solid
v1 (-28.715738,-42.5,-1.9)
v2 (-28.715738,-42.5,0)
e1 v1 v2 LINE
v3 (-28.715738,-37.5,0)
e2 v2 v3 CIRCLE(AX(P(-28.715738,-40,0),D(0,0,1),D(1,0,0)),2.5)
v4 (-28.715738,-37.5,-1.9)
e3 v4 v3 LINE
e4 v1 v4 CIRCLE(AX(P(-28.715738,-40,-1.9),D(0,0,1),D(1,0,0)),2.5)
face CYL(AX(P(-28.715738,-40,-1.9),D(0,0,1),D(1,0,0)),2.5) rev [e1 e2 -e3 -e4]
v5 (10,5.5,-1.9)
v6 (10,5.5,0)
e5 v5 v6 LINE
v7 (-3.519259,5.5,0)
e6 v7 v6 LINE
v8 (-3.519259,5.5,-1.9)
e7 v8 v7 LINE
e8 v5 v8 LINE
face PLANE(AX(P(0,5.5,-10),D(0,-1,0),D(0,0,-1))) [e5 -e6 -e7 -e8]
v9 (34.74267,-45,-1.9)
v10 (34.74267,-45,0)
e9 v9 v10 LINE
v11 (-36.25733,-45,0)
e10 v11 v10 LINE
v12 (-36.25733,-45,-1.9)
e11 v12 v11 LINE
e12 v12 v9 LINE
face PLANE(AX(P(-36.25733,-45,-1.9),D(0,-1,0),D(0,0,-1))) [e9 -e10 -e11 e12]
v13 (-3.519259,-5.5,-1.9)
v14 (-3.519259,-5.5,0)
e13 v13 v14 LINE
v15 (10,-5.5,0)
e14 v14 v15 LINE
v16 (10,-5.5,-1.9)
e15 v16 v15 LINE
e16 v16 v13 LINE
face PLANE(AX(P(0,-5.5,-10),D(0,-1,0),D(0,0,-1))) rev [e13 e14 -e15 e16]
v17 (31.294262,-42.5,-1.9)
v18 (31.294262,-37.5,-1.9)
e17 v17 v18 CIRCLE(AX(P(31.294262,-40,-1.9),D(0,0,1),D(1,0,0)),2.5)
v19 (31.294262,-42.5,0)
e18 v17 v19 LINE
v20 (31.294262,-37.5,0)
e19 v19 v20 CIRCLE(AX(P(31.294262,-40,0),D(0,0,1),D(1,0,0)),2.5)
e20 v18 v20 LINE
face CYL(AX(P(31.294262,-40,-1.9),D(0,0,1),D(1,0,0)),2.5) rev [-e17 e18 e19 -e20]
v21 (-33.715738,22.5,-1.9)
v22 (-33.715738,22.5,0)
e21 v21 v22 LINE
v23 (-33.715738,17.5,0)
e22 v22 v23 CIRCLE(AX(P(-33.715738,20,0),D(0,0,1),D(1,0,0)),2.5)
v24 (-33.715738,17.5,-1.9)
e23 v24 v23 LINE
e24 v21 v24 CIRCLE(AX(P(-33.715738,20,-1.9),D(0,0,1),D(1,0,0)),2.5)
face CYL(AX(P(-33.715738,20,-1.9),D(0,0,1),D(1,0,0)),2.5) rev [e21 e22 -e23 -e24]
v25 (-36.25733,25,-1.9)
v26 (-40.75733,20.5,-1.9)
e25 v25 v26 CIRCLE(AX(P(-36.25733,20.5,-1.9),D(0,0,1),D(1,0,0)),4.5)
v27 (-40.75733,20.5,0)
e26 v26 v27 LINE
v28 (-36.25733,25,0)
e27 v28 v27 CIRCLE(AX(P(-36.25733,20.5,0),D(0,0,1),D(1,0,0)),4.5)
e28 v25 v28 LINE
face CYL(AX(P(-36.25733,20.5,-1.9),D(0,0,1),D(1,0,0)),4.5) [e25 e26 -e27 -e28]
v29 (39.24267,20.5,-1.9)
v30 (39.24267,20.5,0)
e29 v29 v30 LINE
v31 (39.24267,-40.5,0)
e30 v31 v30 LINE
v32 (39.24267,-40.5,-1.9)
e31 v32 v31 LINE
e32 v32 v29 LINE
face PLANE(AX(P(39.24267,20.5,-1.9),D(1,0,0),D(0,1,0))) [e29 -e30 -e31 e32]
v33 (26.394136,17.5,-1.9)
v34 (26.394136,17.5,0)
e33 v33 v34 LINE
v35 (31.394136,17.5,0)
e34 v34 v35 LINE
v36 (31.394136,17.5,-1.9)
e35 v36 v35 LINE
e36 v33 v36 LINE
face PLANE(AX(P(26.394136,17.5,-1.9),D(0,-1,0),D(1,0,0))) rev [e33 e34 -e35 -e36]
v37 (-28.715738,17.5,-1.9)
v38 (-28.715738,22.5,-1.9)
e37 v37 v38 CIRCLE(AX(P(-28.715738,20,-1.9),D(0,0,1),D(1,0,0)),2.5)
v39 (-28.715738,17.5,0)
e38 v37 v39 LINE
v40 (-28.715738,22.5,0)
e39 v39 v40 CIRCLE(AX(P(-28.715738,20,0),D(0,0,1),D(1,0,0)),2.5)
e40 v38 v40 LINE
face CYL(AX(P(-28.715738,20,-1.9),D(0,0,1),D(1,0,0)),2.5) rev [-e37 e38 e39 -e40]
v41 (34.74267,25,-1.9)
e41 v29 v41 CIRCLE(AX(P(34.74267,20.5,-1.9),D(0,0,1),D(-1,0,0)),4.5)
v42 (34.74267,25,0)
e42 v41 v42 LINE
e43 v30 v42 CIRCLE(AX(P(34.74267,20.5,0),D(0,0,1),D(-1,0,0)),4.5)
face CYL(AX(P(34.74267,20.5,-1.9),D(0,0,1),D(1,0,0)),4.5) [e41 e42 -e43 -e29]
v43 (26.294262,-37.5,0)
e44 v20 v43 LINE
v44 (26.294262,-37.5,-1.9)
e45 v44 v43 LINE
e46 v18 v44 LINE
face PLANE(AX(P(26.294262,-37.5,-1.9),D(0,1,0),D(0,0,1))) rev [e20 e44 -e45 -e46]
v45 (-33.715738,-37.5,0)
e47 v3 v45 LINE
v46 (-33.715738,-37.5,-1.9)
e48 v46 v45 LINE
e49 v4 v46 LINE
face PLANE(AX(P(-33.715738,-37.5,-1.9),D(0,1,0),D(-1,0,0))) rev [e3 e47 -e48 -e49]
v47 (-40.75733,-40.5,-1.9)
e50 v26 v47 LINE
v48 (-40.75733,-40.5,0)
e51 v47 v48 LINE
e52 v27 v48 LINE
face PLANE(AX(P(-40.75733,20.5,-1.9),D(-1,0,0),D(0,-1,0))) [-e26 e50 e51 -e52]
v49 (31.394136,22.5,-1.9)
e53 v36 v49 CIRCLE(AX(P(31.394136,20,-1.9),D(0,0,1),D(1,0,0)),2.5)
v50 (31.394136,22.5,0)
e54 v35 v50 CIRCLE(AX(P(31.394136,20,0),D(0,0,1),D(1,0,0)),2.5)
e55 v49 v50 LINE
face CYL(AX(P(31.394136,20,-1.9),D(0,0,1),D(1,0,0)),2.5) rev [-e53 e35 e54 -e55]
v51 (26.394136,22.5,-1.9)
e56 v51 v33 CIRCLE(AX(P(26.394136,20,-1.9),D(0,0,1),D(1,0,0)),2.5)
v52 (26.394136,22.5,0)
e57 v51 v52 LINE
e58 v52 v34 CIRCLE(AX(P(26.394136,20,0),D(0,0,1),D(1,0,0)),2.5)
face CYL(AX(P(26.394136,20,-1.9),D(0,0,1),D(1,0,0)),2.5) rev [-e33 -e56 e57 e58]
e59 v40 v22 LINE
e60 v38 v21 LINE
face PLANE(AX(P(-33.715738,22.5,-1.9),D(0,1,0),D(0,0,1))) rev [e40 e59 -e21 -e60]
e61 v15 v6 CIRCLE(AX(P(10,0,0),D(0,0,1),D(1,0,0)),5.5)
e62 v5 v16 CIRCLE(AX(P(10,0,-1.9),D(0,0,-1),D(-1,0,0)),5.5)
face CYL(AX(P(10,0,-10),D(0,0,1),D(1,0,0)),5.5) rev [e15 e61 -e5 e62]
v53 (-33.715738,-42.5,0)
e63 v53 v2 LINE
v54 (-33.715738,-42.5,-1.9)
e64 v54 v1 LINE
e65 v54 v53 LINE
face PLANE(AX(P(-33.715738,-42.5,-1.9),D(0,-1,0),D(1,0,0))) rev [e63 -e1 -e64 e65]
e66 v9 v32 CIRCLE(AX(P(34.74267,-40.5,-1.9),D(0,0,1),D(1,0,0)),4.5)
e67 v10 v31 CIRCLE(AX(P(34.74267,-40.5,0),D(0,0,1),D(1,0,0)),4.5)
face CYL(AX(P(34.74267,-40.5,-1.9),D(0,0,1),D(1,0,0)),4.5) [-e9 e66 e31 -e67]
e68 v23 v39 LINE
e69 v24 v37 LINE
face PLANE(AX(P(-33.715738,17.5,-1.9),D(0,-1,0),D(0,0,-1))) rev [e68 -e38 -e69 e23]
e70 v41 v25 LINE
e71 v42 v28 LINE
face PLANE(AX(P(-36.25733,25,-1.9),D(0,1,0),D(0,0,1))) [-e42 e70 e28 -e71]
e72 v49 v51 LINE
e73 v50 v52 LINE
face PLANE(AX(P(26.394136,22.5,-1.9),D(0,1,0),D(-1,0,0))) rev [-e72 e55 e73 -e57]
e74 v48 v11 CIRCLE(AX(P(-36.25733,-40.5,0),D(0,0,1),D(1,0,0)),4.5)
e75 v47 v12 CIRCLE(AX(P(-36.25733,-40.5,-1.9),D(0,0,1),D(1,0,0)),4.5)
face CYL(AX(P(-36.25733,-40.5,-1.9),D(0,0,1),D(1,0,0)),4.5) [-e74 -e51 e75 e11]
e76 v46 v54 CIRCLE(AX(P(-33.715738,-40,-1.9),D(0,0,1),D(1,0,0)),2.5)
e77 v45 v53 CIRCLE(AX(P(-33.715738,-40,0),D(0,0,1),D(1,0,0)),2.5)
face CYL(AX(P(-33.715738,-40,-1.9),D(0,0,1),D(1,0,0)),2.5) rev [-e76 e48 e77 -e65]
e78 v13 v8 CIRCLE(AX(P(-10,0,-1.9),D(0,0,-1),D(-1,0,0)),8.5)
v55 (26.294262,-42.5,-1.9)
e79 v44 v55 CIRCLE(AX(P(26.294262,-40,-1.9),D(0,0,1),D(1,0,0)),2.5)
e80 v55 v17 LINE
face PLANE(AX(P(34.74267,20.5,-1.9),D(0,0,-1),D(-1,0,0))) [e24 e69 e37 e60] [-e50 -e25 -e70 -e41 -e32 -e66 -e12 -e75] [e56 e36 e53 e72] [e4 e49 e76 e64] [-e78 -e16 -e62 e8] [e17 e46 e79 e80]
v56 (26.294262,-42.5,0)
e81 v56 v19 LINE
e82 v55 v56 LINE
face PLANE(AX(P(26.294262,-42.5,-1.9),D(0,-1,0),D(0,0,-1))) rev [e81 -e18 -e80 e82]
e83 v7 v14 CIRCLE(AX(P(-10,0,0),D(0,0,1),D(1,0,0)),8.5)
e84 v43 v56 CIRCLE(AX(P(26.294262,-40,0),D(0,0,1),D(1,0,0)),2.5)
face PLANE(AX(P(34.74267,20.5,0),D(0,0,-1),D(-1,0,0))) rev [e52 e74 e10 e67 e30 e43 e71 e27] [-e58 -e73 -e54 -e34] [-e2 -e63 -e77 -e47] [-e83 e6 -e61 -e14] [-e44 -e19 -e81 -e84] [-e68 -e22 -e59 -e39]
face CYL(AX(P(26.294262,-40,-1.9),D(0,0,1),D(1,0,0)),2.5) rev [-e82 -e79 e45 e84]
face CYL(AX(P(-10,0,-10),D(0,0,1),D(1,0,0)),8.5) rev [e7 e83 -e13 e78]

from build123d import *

# Parameters (mm, degrees)
BASE_FLANGE1_START = -1.9
BASE_FLANGE1_DEPTH = 1.9
CUT_EXTRUDE1_DEPTH = 10


# Read off the part's stored shape, not the designer's step: Base-Flange1
with BuildPart() as part:
    # Base-Flange1 outline → Base-Flange1 (new body)
    with BuildSketch(Plane.XY.offset(BASE_FLANGE1_START)):
        with BuildLine():
            Line((39.242670298, -40.5), (39.242670298, 20.5))
            ThreePointArc((39.242670298, 20.5), (37.924650813, 23.681980515), (34.742670298, 25))
            Line((34.742670298, 25), (-36.257329702, 25))
            ThreePointArc((-36.257329702, 25), (-39.439310218, 23.681980516), (-40.757329702, 20.5))
            Line((-40.757329702, 20.5), (-40.757329702, -40.5))
            ThreePointArc((-40.757329702, -40.5), (-39.439310218, -43.681980516), (-36.257329702, -45))
            Line((-36.257329702, -45), (34.742670298, -45))
            ThreePointArc((34.742670298, -45), (37.924650813, -43.681980515), (39.242670298, -40.5))
        make_face()
        with BuildLine():
            ThreePointArc((-33.7157381, -42.5), (-36.2157381, -40), (-33.7157381, -37.5))
            Line((-33.7157381, -37.5), (-28.7157381, -37.5))
            ThreePointArc((-28.7157381, -37.5), (-26.2157381, -40), (-28.7157381, -42.5))
            Line((-28.7157381, -42.5), (-33.7157381, -42.5))
        make_face(mode=Mode.SUBTRACT)
        with BuildLine():
            ThreePointArc((26.2942619, -42.5), (23.7942619, -40), (26.2942619, -37.5))
            Line((26.2942619, -37.5), (31.2942619, -37.5))
            ThreePointArc((31.2942619, -37.5), (33.7942619, -40), (31.2942619, -42.5))
            Line((31.2942619, -42.5), (26.2942619, -42.5))
        make_face(mode=Mode.SUBTRACT)
        with BuildLine():
            ThreePointArc((-33.7157381, 17.5), (-36.2157381, 20), (-33.7157381, 22.5))
            Line((-33.7157381, 22.5), (-28.7157381, 22.5))
            ThreePointArc((-28.7157381, 22.5), (-26.2157381, 20), (-28.7157381, 17.5))
            Line((-28.7157381, 17.5), (-33.7157381, 17.5))
        make_face(mode=Mode.SUBTRACT)
        with BuildLine():
            ThreePointArc((26.394136238, 17.5), (23.894136238, 20), (26.394136238, 22.5))
            Line((26.394136238, 22.5), (31.394136238, 22.5))
            ThreePointArc((31.394136238, 22.5), (33.894136238, 20), (31.394136238, 17.5))
            Line((31.394136238, 17.5), (26.394136238, 17.5))
        make_face(mode=Mode.SUBTRACT)
    extrude(amount=BASE_FLANGE1_DEPTH)

    # Sketch6 → Cut-Extrude1 (cut)
    with BuildSketch(Plane.XY):
        with BuildLine():
            Line((10, 5.5), (-3.519259302, 5.5))
            ThreePointArc((-3.519259302, 5.5), (-18.5, 0), (-3.519259302, -5.5))
            Line((-3.519259302, -5.5), (10, -5.5))
            ThreePointArc((10, -5.5), (15.5, 0), (10, 5.5))
        make_face()
    extrude(amount=-CUT_EXTRUDE1_DEPTH, mode=Mode.SUBTRACT)


solid = part.part
